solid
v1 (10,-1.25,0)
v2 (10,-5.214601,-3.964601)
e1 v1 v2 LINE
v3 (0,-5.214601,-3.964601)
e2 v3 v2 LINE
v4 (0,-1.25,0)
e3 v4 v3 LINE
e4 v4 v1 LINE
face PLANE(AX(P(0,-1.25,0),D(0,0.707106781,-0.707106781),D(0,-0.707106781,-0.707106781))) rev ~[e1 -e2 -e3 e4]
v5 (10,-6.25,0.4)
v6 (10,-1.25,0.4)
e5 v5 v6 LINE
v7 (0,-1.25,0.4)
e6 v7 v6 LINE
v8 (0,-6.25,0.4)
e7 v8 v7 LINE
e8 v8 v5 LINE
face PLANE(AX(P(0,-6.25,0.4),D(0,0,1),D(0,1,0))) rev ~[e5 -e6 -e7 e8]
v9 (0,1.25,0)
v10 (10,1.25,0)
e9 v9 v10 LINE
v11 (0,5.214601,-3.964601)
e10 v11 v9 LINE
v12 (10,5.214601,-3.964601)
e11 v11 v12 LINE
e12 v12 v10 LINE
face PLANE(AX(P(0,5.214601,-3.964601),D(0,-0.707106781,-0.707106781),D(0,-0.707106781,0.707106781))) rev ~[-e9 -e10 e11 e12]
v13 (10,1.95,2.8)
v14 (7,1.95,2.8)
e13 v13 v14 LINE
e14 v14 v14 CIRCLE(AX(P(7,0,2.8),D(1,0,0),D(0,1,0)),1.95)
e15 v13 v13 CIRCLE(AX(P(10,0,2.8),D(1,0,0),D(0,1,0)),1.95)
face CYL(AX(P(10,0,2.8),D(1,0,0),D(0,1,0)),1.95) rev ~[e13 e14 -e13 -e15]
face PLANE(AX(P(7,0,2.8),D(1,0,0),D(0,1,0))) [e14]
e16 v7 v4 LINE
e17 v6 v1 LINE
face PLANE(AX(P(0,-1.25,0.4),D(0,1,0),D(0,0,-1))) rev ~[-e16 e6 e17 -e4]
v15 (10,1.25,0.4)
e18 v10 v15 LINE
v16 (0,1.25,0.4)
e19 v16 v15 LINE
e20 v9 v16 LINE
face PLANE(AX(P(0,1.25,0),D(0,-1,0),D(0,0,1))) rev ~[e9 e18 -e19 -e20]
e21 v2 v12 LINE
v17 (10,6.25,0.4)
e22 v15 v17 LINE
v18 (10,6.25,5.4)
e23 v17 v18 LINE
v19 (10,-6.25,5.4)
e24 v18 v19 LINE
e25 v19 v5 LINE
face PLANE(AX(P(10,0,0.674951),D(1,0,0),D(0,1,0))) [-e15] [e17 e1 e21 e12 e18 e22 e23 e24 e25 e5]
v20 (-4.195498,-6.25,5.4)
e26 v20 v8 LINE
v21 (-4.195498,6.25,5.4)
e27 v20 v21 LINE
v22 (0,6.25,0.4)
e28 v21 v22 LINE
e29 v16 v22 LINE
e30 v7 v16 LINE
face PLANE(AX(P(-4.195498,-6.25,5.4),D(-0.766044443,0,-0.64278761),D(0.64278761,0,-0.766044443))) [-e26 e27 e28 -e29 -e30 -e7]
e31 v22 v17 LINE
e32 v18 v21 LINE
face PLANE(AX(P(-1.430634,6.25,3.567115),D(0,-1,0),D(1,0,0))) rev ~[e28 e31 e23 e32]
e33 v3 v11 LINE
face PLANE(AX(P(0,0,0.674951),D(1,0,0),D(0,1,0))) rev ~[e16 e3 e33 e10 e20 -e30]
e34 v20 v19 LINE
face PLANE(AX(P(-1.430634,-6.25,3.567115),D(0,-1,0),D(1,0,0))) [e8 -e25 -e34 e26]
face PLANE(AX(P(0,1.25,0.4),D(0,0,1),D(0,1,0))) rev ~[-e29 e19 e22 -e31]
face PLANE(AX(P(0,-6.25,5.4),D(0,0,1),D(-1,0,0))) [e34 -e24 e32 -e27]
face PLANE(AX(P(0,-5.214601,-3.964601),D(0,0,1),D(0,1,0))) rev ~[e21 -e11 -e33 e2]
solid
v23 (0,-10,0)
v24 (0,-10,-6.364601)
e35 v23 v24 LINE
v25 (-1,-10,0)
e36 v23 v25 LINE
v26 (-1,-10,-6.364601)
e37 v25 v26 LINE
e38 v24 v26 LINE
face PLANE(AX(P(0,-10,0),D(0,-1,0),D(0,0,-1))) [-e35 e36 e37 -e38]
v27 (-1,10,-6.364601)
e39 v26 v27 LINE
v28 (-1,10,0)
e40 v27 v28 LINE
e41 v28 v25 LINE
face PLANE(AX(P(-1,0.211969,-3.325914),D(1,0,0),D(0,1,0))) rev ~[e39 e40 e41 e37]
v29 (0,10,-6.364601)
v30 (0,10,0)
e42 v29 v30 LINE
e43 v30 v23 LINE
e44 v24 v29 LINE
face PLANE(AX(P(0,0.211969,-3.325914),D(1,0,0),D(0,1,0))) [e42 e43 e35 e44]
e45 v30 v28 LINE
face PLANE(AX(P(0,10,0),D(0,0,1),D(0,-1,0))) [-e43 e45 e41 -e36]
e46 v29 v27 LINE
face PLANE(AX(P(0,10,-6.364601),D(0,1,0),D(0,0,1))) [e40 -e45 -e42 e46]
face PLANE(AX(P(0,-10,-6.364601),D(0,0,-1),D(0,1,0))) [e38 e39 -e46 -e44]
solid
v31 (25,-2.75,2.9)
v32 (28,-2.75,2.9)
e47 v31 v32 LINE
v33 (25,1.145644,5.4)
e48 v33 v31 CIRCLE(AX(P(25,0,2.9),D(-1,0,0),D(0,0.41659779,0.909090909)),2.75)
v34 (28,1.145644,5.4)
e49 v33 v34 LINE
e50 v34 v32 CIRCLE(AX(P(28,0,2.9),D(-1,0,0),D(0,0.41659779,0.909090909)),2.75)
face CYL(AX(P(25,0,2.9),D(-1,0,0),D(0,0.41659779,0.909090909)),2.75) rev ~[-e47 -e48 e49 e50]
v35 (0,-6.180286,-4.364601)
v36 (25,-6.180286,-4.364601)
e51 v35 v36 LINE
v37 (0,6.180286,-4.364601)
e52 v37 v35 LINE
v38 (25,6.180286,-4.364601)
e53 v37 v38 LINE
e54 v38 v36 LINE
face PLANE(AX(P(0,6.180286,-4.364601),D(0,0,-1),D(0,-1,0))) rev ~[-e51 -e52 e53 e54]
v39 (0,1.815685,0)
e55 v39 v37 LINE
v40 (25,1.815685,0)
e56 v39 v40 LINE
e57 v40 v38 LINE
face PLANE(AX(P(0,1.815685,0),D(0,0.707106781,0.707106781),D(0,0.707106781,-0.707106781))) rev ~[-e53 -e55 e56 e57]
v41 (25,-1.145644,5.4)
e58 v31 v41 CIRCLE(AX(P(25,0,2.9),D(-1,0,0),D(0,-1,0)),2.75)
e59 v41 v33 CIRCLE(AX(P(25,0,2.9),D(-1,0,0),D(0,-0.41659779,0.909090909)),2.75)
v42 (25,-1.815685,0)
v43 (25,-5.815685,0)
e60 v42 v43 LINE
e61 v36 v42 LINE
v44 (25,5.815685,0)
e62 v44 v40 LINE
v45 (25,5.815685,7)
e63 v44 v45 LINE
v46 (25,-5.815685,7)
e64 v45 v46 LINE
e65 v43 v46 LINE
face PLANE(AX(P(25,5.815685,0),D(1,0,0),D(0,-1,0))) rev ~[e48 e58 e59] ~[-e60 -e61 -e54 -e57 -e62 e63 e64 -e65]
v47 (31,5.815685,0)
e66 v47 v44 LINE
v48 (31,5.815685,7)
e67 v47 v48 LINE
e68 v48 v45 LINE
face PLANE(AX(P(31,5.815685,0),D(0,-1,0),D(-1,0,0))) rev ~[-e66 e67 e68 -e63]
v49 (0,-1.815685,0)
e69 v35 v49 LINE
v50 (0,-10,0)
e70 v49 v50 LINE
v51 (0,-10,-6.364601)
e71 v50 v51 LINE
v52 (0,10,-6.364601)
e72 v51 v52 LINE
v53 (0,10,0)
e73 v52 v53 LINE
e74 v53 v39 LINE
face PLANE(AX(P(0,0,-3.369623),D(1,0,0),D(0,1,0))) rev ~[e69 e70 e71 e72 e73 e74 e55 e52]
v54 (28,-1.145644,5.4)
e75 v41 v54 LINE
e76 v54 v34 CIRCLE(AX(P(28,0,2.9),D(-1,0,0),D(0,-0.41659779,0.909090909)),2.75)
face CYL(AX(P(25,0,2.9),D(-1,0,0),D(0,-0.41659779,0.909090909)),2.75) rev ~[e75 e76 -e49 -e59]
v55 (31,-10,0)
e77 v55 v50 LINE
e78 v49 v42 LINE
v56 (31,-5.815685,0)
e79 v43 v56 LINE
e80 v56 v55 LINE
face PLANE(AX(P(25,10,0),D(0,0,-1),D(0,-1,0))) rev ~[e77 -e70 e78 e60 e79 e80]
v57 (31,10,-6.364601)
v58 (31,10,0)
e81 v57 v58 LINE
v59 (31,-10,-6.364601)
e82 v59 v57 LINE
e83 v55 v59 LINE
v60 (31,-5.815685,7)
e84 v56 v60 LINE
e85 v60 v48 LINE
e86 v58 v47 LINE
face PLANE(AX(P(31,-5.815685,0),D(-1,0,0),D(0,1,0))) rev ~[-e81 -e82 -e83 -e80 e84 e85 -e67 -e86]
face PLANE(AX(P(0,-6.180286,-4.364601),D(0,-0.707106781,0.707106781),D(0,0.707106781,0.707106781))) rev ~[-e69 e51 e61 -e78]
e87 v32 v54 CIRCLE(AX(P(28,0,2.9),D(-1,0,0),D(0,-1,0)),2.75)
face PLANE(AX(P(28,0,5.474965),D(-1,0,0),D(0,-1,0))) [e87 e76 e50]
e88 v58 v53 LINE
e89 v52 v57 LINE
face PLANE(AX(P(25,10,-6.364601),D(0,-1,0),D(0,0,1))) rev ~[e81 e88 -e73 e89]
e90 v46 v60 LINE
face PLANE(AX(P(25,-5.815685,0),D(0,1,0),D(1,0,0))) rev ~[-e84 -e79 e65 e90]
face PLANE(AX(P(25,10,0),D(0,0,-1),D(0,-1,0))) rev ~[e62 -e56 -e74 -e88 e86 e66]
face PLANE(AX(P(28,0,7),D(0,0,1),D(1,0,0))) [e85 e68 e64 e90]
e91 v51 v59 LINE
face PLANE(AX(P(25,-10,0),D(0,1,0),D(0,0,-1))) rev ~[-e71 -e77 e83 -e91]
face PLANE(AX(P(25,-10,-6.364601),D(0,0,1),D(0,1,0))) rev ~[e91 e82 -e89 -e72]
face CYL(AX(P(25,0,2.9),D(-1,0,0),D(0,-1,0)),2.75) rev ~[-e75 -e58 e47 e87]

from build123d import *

# Parameters (mm, degrees)
F2_DEPTH  = 25
F3_DEPTH  = 10
F5_DEPTH  = 12.5
F7_DEPTH  = 6
F9_DEPTH  = 7
F11_DEPTH = 3
F12_R     = 1.95
F12_R_2   = 1
F13_DEPTH = 3
F15_DEPTH = 1


# Not quite as in the source:
# - a feature names something its author has since deleted; it is built from what else it names


with BuildPart() as f2:
    # F1 (on Right) → F2 (new body)
    with BuildSketch(Plane.YZ):
        Polygon((10, -6.3646009103), (10, 0), (1.8156854249, 0), (6.1802863352, -4.3646009103), (0, -4.3646009103), (-6.1802863352, -4.3646009103), (-1.8156854249, 0), (-10, 0), (-10, -6.3646009103), (0, -6.3646009103), align=None)
    extrude(amount=F2_DEPTH)

    # F6 (on face) → F7 (join)
    with BuildSketch(Plane.YZ.offset(25)):
        Polygon((-6.1802863352, -4.3646009103), (-1.8156854249, 0), (-10, 0), (-10, -6.3646009103), (10, -6.3646009103), (10, 0), (1.8156854249, 0), (6.1802863352, -4.3646009103), align=None)
        Polygon((1.8156854249, 0), (-1.8156854249, 0), (-6.1802863352, -4.3646009103), (6.1802863352, -4.3646009103), align=None)
    extrude(amount=F7_DEPTH)

    # F8 (on face) → F9 (join)
    with BuildSketch(Plane.XY):
        Polygon((25, 1.8156854249), (25, -1.8156854249), (25, -5.8156854249), (31, -5.8156854249), (31, 5.8156854249), (25, 5.8156854249), align=None)
    extrude(amount=F9_DEPTH)

    # F10 (on face) → F11 (cut)
    with BuildSketch(Plane(origin=(25, 0, 0), x_dir=(0, -1, 0), z_dir=(-1, 0, 0))):
        with BuildLine():
            ThreePointArc((1.1456439237, 5.4), (0, 5.65), (-1.1456439237, 5.4))
            Line((-1.1456439237, 5.4), (1.1456439237, 5.4))
        make_face()
        with BuildLine():
            Line((1.1456439237, 5.4), (-1.1456439237, 5.4))
            ThreePointArc((-1.1456439237, 5.4), (-1.4852574204, 0.585586382), (2.75, 2.9))
            ThreePointArc((2.75, 2.9), (2.314413618, 4.3852574204), (1.1456439237, 5.4))
        make_face()
    extrude(amount=-F11_DEPTH, mode=Mode.SUBTRACT)


with BuildPart() as f3:
    # F1 (on Right) → F3 (new body)
    with BuildSketch(Plane.YZ):
        Polygon((0, -3.9646009103), (5.2146009103, -3.9646009103), (1.25, 0), (1.25, 0.4), (6.25, 0.4), (6.25, 5.4), (0, 5.4), (-6.25, 5.4), (-6.25, 0.4), (-1.25, 0.4), (-1.25, 0), (-5.2146009103, -3.9646009103), align=None)
    extrude(amount=F3_DEPTH)

    # F4 (on face) → F5 (join, through all)
    with BuildSketch(Plane.XZ.offset(6.25)):
        Polygon((-4.1954981559, 5.4), (0, 0.4), (0, 5.4), align=None)
    extrude(amount=-F5_DEPTH)

    # F12 (on face) → F13 (cut)
    with BuildSketch(Plane.YZ.offset(10)):
        with Locations((0, 2.8)):
            Circle(F12_R)
        with Locations((0, 2.8)):
            Circle(F12_R_2, mode=Mode.SUBTRACT)
        with Locations((0, 2.8)):
            Circle(F12_R_2)
    extrude(amount=-F13_DEPTH, mode=Mode.SUBTRACT)


with BuildPart() as f15:
    # F14 (on face) → F15 (new body)
    with BuildSketch(Plane.YZ):
        Polygon((0.1802863352, -0.3646009103), (4.1802863352, -0.3646009103), (4.1802863352, 0), (-10, 0), (-10, -6.3646009103), (0, -6.3646009103), (10, -6.3646009103), (10, -2), (6, -2), (6, -4.3646009103), (0.1802863352, -4.3646009103), align=None)
        Polygon((4.1802863352, 0), (4.1802863352, -0.3646009103), (0.1802863352, -0.3646009103), (0.1802863352, -4.3646009103), (6, -4.3646009103), (6, -2), (10, -2), (10, 0), align=None)
    extrude(amount=-F15_DEPTH)


solid = Compound([f2.part, f3.part, f15.part])
